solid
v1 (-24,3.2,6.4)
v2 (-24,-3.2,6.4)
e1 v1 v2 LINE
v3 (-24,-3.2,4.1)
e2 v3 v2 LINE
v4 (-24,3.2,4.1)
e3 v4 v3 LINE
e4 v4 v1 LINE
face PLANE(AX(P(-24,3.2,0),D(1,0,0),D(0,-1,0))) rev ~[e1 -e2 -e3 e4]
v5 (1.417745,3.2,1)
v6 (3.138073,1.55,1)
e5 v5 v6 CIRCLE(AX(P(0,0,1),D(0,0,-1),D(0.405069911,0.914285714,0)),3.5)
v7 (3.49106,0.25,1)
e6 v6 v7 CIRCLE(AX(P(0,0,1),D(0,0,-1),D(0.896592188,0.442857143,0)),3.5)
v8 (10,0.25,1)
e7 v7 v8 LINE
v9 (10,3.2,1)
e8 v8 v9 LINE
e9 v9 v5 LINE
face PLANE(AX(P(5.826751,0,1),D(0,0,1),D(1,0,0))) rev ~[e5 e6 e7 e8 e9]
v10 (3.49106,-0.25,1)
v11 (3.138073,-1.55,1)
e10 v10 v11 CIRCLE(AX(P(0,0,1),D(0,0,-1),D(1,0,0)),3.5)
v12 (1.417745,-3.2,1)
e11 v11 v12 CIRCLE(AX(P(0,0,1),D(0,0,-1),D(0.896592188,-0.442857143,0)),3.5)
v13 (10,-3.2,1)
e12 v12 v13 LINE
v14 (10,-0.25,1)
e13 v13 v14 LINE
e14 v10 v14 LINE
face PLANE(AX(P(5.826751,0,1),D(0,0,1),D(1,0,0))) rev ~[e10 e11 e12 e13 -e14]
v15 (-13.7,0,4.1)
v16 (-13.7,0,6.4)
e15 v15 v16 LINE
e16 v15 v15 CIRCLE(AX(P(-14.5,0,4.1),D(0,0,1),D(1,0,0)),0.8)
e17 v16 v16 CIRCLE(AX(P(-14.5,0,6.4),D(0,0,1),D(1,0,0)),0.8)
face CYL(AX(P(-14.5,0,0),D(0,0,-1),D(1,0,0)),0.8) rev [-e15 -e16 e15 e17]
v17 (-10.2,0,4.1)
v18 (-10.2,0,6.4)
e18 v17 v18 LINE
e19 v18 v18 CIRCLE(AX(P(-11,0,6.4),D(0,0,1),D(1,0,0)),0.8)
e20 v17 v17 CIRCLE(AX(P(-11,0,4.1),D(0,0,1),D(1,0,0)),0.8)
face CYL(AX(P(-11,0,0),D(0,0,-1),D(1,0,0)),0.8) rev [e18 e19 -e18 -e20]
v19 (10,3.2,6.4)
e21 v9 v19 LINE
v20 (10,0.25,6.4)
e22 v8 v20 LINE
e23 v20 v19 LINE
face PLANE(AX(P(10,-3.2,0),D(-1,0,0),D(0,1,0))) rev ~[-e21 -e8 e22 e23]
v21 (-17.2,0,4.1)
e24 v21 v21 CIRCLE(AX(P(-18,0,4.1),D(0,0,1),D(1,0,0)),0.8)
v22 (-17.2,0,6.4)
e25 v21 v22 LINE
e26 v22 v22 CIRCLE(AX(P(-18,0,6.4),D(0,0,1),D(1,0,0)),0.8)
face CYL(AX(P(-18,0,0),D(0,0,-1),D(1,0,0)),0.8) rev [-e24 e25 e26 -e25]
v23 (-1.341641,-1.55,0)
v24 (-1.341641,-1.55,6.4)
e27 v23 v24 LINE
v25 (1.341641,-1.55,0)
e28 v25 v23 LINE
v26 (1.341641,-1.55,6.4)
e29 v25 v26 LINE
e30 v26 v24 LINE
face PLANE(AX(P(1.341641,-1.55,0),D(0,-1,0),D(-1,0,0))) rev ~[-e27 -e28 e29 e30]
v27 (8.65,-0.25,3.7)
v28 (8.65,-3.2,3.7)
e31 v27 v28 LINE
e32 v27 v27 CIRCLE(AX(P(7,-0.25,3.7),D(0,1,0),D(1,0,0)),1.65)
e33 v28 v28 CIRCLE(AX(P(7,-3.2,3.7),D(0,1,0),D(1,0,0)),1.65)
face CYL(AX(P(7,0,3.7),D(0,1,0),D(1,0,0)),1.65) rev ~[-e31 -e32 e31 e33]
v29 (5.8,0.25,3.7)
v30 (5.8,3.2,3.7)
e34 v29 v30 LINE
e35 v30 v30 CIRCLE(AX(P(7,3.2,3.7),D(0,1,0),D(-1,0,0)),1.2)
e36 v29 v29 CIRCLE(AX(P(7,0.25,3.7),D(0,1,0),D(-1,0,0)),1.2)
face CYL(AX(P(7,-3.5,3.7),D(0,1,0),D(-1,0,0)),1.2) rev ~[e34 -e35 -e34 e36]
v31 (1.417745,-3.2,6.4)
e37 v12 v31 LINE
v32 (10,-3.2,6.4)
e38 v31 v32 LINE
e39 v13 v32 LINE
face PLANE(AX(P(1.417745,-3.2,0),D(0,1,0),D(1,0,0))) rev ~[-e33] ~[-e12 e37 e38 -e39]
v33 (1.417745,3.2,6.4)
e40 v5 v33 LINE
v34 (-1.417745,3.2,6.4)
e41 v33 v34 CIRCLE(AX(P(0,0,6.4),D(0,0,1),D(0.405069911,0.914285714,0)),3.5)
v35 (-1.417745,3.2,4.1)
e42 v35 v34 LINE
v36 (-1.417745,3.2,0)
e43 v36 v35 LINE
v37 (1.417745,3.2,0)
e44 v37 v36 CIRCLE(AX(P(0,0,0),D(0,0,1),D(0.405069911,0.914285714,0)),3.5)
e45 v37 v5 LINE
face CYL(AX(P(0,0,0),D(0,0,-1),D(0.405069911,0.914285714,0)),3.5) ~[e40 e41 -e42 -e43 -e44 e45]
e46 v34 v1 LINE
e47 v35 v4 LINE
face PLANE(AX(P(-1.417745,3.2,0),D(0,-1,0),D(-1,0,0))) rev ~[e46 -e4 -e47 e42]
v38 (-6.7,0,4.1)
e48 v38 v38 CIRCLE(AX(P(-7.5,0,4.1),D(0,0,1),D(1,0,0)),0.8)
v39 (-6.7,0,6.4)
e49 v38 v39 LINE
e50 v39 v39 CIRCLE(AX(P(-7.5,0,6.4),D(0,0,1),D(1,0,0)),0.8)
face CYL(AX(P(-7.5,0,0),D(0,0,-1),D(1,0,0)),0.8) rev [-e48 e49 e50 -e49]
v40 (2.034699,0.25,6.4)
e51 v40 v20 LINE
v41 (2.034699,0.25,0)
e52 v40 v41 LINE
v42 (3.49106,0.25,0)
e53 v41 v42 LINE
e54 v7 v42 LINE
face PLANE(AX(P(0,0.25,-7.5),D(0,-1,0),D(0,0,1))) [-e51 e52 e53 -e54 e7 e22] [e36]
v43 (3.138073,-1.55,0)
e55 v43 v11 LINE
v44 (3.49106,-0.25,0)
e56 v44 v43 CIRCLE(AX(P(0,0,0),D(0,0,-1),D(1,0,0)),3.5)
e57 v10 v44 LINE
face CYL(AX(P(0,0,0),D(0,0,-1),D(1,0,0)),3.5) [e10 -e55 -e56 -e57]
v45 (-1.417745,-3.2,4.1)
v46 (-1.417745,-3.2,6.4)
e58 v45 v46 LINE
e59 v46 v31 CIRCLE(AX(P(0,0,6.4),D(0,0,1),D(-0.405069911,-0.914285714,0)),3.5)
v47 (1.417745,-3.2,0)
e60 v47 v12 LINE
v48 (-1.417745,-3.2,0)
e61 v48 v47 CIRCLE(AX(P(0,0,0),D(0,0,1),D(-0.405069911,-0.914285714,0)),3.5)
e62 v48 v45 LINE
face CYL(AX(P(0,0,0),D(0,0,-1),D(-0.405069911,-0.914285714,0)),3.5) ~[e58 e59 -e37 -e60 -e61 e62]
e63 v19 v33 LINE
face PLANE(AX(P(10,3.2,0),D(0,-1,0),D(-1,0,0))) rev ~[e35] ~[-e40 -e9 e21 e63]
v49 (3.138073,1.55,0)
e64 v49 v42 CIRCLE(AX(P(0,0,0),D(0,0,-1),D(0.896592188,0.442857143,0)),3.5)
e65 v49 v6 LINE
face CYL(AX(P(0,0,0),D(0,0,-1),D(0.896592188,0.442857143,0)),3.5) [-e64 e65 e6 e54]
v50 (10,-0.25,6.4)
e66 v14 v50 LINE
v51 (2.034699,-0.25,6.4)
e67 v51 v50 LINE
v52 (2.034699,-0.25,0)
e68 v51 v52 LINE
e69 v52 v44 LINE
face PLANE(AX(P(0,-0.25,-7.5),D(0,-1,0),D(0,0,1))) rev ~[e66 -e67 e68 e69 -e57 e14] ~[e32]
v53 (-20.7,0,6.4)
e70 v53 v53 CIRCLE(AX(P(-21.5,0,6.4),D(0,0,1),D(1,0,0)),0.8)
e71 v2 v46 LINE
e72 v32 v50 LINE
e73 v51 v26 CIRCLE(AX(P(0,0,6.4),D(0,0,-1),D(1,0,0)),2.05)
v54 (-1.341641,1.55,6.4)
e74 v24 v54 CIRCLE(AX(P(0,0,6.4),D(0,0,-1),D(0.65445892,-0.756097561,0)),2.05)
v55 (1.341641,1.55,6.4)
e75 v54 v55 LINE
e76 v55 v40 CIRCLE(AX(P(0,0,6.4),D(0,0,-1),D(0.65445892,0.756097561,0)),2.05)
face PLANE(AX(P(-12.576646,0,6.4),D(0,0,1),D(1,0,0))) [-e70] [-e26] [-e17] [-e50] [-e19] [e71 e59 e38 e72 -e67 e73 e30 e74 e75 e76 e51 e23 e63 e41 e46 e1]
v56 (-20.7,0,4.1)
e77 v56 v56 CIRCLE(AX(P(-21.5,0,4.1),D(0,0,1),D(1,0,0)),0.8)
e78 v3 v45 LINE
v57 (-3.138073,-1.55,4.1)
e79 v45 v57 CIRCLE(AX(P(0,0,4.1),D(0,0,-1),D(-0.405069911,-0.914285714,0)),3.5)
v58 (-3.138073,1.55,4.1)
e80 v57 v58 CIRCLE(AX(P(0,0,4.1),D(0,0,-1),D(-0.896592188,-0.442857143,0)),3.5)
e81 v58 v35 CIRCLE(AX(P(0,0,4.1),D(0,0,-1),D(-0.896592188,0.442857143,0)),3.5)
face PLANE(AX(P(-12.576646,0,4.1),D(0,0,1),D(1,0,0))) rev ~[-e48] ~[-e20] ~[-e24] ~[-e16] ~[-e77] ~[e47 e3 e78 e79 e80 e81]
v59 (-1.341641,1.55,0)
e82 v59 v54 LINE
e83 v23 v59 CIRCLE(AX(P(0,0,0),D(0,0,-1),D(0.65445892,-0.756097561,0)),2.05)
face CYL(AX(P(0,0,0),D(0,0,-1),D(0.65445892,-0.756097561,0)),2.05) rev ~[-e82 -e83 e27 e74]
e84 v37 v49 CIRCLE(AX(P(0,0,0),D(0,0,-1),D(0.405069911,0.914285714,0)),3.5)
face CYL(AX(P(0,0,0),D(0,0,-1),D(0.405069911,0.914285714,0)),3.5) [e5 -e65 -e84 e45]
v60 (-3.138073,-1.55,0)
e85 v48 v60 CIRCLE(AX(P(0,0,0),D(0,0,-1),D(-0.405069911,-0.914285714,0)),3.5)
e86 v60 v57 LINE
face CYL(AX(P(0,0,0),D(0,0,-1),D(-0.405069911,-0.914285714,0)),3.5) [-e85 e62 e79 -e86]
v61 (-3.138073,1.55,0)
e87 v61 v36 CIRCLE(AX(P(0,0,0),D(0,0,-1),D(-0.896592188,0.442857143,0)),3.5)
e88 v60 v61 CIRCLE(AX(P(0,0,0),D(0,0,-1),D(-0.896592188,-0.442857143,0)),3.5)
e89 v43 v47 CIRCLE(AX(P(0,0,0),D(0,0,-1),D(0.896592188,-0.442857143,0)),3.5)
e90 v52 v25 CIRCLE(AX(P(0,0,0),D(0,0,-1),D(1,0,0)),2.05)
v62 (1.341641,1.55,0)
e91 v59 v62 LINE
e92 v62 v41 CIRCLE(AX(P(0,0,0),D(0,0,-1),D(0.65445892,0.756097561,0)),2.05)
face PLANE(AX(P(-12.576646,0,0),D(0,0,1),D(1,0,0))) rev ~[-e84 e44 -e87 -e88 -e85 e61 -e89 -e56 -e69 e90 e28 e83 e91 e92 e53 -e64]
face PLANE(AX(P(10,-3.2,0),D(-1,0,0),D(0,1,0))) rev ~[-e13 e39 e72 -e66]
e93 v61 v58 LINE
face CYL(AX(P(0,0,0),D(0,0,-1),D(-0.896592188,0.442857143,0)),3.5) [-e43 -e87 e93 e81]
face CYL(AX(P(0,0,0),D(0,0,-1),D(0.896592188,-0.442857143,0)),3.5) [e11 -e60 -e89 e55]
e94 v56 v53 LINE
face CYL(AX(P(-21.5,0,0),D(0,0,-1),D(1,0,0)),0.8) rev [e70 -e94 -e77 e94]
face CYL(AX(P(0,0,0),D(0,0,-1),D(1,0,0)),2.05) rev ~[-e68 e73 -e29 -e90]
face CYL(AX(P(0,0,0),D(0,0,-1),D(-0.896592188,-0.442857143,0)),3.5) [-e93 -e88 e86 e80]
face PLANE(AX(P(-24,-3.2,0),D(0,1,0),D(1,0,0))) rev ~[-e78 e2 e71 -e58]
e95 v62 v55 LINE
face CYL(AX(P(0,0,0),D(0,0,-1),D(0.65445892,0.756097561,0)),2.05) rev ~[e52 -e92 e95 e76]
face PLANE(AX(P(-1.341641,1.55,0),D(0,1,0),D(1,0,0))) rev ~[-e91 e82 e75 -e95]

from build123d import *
from build123d import SkipClean  # not in build123d's __all__

# Parameters (mm, degrees)
F0_R     = 0.8
F1_DEPTH = 6.4
F2_DEPTH = 1
F3_DEPTH = 4.1
F4_W     = 0.5
F4_H     = 15
F5_DEPTH = 25
F7_D     = 3.3
F7_DEPTH = 3.2
F7_TIP   = 0.9914200214
F8_D     = 2.4
F8_DEPTH = 3.5
F8_TIP   = 0.7210327428


with BuildPart() as f1:
    # F0 (on Top) → F1 (new body)
    with BuildSketch(Plane.XY):
        with BuildLine():
            Line((-24, -3.2), (-1.4177446879, -3.2))
            ThreePointArc((-1.4177446879, -3.2), (-2.4227036384, -2.5259665636), (-3.1380726569, -1.55))
            ThreePointArc((-3.1380726569, -1.55), (-3.5, 0), (-3.1380726569, 1.55))
            ThreePointArc((-3.1380726569, 1.55), (-2.4227036384, 2.5259665636), (-1.4177446879, 3.2))
            Line((-1.4177446879, 3.2), (-24, 3.2))
            Line((-24, 3.2), (-24, -3.2))
        make_face()
        with Locations((-21.5, 0)):
            Circle(F0_R, mode=Mode.SUBTRACT)
        with Locations((-18, 0)):
            Circle(F0_R, mode=Mode.SUBTRACT)
        with Locations((-14.5, 0)):
            Circle(F0_R, mode=Mode.SUBTRACT)
        with Locations((-11, 0)):
            Circle(F0_R, mode=Mode.SUBTRACT)
        with Locations((-7.5, 0)):
            Circle(F0_R, mode=Mode.SUBTRACT)
        with BuildLine():
            Line((-3.1380726569, -1.55), (-1.3416407865, -1.55))
            ThreePointArc((-1.3416407865, -1.55), (-2.05, 0), (-1.3416407865, 1.55))
            Line((-1.3416407865, 1.55), (-3.1380726569, 1.55))
            ThreePointArc((-3.1380726569, 1.55), (-3.5, 0), (-3.1380726569, -1.55))
        make_face()
        with BuildLine():
            ThreePointArc((1.4177446879, -3.2), (2.4227036384, -2.5259665636), (3.1380726569, -1.55))
            Line((3.1380726569, -1.55), (1.3416407865, -1.55))
            ThreePointArc((1.3416407865, -1.55), (0, -2.05), (-1.3416407865, -1.55))
            Line((-1.3416407865, -1.55), (-3.1380726569, -1.55))
            ThreePointArc((-3.1380726569, -1.55), (-2.4227036384, -2.5259665636), (-1.4177446879, -3.2))
            Line((-1.4177446879, -3.2), (1.4177446879, -3.2))
        make_face()
        with BuildLine():
            Line((1.3416407865, 1.55), (3.1380726569, 1.55))
            ThreePointArc((3.1380726569, 1.55), (2.4227036384, 2.5259665636), (1.4177446879, 3.2))
            Line((1.4177446879, 3.2), (-1.4177446879, 3.2))
            ThreePointArc((-1.4177446879, 3.2), (-2.4227036384, 2.5259665636), (-3.1380726569, 1.55))
            Line((-3.1380726569, 1.55), (-1.3416407865, 1.55))
            ThreePointArc((-1.3416407865, 1.55), (0, 2.05), (1.3416407865, 1.55))
        make_face()
        with BuildLine():
            ThreePointArc((1.3416407865, 1.55), (0, 2.05), (-1.3416407865, 1.55))
            Line((-1.3416407865, 1.55), (1.3416407865, 1.55))
        make_face()
        with BuildLine():
            ThreePointArc((-1.3416407865, -1.55), (0, -2.05), (1.3416407865, -1.55))
            Line((1.3416407865, -1.55), (-1.3416407865, -1.55))
        make_face()
        with BuildLine():
            Line((1.3416407865, -1.55), (3.1380726569, -1.55))
            ThreePointArc((3.1380726569, -1.55), (3.4083173487, -0.7958472532), (3.5, 0))
            ThreePointArc((3.5, 0), (3.4083173487, 0.7958472532), (3.1380726569, 1.55))
            Line((3.1380726569, 1.55), (1.3416407865, 1.55))
            ThreePointArc((1.3416407865, 1.55), (1.864519189, 0.8520963524), (2.05, 0))
            ThreePointArc((2.05, 0), (1.864519189, -0.8520963524), (1.3416407865, -1.55))
        make_face()
        with BuildLine():
            ThreePointArc((3.5, 0), (3.4083173487, -0.7958472532), (3.1380726569, -1.55))
            ThreePointArc((3.1380726569, -1.55), (2.4227036384, -2.5259665636), (1.4177446879, -3.2))
            Line((1.4177446879, -3.2), (10, -3.2))
            Line((10, -3.2), (10, 3.2))
            Line((10, 3.2), (1.4177446879, 3.2))
            ThreePointArc((1.4177446879, 3.2), (2.4227036384, 2.5259665636), (3.1380726569, 1.55))
            ThreePointArc((3.1380726569, 1.55), (3.4083173487, 0.7958472532), (3.5, 0))
        make_face()
        with BuildLine():
            ThreePointArc((-1.4177446879, -3.2), (0, -3.5), (1.4177446879, -3.2))
            Line((1.4177446879, -3.2), (-1.4177446879, -3.2))
        make_face()
        with BuildLine():
            Line((-1.4177446879, 3.2), (1.4177446879, 3.2))
            ThreePointArc((1.4177446879, 3.2), (0, 3.5), (-1.4177446879, 3.2))
        make_face()
    extrude(amount=F1_DEPTH)

    # F0 (on Top) → F2 (cut)
    with BuildSketch(Plane.XY):
        with BuildLine():
            ThreePointArc((3.5, 0), (3.4083173487, -0.7958472532), (3.1380726569, -1.55))
            ThreePointArc((3.1380726569, -1.55), (2.4227036384, -2.5259665636), (1.4177446879, -3.2))
            Line((1.4177446879, -3.2), (10, -3.2))
            Line((10, -3.2), (10, 3.2))
            Line((10, 3.2), (1.4177446879, 3.2))
            ThreePointArc((1.4177446879, 3.2), (2.4227036384, 2.5259665636), (3.1380726569, 1.55))
            ThreePointArc((3.1380726569, 1.55), (3.4083173487, 0.7958472532), (3.5, 0))
        make_face()
    with SkipClean():  # cleaning this boolean's faces spoils the solid; the shape is the same uncleaned
        extrude(amount=F2_DEPTH, mode=Mode.SUBTRACT)

    # F0 (on Top) → F3 (cut)
    with BuildSketch(Plane.XY):
        with BuildLine():
            Line((-24, -3.2), (-1.4177446879, -3.2))
            ThreePointArc((-1.4177446879, -3.2), (-2.4227036384, -2.5259665636), (-3.1380726569, -1.55))
            ThreePointArc((-3.1380726569, -1.55), (-3.5, 0), (-3.1380726569, 1.55))
            ThreePointArc((-3.1380726569, 1.55), (-2.4227036384, 2.5259665636), (-1.4177446879, 3.2))
            Line((-1.4177446879, 3.2), (-24, 3.2))
            Line((-24, 3.2), (-24, -3.2))
        make_face()
        with Locations((-21.5, 0)):
            Circle(F0_R, mode=Mode.SUBTRACT)
        with Locations((-18, 0)):
            Circle(F0_R, mode=Mode.SUBTRACT)
        with Locations((-14.5, 0)):
            Circle(F0_R, mode=Mode.SUBTRACT)
        with Locations((-11, 0)):
            Circle(F0_R, mode=Mode.SUBTRACT)
        with Locations((-7.5, 0)):
            Circle(F0_R, mode=Mode.SUBTRACT)
    extrude(amount=F3_DEPTH, mode=Mode.SUBTRACT)

    # F4 (on Right) → F5 (cut)
    with BuildSketch(Plane.YZ):
        Rectangle(F4_W, F4_H)
    extrude(amount=F5_DEPTH, mode=Mode.SUBTRACT)

    # F7 (one way)
    with BuildSketch(Plane(origin=(0, 0, 0), x_dir=(1, 0, 0), z_dir=(0, 1, 0))):
        with Locations((7, -3.7)):
            Circle(F7_D / 2)
    extrude(amount=-F7_DEPTH, mode=Mode.SUBTRACT)
    with Locations(Plane(origin=(0, 0, 0), x_dir=(1, 0, 0), z_dir=(0, 1, 0))):
        with Locations((7, -3.7)):
            with Locations((0, 0, -(F7_DEPTH + F7_TIP / 2))):  # 118° drill point
                Cone(0, F7_D / 2, F7_TIP, mode=Mode.SUBTRACT)

    # F8
    with Locations(Plane.XZ):
        with Locations((7, 3.7)):
            Hole(F8_D / 2, depth=F8_DEPTH)
            with Locations((0, 0, -(F8_DEPTH + F8_TIP / 2))):  # 118° drill point
                Cone(0, F8_D / 2, F8_TIP, mode=Mode.SUBTRACT)


solid = f1.part
